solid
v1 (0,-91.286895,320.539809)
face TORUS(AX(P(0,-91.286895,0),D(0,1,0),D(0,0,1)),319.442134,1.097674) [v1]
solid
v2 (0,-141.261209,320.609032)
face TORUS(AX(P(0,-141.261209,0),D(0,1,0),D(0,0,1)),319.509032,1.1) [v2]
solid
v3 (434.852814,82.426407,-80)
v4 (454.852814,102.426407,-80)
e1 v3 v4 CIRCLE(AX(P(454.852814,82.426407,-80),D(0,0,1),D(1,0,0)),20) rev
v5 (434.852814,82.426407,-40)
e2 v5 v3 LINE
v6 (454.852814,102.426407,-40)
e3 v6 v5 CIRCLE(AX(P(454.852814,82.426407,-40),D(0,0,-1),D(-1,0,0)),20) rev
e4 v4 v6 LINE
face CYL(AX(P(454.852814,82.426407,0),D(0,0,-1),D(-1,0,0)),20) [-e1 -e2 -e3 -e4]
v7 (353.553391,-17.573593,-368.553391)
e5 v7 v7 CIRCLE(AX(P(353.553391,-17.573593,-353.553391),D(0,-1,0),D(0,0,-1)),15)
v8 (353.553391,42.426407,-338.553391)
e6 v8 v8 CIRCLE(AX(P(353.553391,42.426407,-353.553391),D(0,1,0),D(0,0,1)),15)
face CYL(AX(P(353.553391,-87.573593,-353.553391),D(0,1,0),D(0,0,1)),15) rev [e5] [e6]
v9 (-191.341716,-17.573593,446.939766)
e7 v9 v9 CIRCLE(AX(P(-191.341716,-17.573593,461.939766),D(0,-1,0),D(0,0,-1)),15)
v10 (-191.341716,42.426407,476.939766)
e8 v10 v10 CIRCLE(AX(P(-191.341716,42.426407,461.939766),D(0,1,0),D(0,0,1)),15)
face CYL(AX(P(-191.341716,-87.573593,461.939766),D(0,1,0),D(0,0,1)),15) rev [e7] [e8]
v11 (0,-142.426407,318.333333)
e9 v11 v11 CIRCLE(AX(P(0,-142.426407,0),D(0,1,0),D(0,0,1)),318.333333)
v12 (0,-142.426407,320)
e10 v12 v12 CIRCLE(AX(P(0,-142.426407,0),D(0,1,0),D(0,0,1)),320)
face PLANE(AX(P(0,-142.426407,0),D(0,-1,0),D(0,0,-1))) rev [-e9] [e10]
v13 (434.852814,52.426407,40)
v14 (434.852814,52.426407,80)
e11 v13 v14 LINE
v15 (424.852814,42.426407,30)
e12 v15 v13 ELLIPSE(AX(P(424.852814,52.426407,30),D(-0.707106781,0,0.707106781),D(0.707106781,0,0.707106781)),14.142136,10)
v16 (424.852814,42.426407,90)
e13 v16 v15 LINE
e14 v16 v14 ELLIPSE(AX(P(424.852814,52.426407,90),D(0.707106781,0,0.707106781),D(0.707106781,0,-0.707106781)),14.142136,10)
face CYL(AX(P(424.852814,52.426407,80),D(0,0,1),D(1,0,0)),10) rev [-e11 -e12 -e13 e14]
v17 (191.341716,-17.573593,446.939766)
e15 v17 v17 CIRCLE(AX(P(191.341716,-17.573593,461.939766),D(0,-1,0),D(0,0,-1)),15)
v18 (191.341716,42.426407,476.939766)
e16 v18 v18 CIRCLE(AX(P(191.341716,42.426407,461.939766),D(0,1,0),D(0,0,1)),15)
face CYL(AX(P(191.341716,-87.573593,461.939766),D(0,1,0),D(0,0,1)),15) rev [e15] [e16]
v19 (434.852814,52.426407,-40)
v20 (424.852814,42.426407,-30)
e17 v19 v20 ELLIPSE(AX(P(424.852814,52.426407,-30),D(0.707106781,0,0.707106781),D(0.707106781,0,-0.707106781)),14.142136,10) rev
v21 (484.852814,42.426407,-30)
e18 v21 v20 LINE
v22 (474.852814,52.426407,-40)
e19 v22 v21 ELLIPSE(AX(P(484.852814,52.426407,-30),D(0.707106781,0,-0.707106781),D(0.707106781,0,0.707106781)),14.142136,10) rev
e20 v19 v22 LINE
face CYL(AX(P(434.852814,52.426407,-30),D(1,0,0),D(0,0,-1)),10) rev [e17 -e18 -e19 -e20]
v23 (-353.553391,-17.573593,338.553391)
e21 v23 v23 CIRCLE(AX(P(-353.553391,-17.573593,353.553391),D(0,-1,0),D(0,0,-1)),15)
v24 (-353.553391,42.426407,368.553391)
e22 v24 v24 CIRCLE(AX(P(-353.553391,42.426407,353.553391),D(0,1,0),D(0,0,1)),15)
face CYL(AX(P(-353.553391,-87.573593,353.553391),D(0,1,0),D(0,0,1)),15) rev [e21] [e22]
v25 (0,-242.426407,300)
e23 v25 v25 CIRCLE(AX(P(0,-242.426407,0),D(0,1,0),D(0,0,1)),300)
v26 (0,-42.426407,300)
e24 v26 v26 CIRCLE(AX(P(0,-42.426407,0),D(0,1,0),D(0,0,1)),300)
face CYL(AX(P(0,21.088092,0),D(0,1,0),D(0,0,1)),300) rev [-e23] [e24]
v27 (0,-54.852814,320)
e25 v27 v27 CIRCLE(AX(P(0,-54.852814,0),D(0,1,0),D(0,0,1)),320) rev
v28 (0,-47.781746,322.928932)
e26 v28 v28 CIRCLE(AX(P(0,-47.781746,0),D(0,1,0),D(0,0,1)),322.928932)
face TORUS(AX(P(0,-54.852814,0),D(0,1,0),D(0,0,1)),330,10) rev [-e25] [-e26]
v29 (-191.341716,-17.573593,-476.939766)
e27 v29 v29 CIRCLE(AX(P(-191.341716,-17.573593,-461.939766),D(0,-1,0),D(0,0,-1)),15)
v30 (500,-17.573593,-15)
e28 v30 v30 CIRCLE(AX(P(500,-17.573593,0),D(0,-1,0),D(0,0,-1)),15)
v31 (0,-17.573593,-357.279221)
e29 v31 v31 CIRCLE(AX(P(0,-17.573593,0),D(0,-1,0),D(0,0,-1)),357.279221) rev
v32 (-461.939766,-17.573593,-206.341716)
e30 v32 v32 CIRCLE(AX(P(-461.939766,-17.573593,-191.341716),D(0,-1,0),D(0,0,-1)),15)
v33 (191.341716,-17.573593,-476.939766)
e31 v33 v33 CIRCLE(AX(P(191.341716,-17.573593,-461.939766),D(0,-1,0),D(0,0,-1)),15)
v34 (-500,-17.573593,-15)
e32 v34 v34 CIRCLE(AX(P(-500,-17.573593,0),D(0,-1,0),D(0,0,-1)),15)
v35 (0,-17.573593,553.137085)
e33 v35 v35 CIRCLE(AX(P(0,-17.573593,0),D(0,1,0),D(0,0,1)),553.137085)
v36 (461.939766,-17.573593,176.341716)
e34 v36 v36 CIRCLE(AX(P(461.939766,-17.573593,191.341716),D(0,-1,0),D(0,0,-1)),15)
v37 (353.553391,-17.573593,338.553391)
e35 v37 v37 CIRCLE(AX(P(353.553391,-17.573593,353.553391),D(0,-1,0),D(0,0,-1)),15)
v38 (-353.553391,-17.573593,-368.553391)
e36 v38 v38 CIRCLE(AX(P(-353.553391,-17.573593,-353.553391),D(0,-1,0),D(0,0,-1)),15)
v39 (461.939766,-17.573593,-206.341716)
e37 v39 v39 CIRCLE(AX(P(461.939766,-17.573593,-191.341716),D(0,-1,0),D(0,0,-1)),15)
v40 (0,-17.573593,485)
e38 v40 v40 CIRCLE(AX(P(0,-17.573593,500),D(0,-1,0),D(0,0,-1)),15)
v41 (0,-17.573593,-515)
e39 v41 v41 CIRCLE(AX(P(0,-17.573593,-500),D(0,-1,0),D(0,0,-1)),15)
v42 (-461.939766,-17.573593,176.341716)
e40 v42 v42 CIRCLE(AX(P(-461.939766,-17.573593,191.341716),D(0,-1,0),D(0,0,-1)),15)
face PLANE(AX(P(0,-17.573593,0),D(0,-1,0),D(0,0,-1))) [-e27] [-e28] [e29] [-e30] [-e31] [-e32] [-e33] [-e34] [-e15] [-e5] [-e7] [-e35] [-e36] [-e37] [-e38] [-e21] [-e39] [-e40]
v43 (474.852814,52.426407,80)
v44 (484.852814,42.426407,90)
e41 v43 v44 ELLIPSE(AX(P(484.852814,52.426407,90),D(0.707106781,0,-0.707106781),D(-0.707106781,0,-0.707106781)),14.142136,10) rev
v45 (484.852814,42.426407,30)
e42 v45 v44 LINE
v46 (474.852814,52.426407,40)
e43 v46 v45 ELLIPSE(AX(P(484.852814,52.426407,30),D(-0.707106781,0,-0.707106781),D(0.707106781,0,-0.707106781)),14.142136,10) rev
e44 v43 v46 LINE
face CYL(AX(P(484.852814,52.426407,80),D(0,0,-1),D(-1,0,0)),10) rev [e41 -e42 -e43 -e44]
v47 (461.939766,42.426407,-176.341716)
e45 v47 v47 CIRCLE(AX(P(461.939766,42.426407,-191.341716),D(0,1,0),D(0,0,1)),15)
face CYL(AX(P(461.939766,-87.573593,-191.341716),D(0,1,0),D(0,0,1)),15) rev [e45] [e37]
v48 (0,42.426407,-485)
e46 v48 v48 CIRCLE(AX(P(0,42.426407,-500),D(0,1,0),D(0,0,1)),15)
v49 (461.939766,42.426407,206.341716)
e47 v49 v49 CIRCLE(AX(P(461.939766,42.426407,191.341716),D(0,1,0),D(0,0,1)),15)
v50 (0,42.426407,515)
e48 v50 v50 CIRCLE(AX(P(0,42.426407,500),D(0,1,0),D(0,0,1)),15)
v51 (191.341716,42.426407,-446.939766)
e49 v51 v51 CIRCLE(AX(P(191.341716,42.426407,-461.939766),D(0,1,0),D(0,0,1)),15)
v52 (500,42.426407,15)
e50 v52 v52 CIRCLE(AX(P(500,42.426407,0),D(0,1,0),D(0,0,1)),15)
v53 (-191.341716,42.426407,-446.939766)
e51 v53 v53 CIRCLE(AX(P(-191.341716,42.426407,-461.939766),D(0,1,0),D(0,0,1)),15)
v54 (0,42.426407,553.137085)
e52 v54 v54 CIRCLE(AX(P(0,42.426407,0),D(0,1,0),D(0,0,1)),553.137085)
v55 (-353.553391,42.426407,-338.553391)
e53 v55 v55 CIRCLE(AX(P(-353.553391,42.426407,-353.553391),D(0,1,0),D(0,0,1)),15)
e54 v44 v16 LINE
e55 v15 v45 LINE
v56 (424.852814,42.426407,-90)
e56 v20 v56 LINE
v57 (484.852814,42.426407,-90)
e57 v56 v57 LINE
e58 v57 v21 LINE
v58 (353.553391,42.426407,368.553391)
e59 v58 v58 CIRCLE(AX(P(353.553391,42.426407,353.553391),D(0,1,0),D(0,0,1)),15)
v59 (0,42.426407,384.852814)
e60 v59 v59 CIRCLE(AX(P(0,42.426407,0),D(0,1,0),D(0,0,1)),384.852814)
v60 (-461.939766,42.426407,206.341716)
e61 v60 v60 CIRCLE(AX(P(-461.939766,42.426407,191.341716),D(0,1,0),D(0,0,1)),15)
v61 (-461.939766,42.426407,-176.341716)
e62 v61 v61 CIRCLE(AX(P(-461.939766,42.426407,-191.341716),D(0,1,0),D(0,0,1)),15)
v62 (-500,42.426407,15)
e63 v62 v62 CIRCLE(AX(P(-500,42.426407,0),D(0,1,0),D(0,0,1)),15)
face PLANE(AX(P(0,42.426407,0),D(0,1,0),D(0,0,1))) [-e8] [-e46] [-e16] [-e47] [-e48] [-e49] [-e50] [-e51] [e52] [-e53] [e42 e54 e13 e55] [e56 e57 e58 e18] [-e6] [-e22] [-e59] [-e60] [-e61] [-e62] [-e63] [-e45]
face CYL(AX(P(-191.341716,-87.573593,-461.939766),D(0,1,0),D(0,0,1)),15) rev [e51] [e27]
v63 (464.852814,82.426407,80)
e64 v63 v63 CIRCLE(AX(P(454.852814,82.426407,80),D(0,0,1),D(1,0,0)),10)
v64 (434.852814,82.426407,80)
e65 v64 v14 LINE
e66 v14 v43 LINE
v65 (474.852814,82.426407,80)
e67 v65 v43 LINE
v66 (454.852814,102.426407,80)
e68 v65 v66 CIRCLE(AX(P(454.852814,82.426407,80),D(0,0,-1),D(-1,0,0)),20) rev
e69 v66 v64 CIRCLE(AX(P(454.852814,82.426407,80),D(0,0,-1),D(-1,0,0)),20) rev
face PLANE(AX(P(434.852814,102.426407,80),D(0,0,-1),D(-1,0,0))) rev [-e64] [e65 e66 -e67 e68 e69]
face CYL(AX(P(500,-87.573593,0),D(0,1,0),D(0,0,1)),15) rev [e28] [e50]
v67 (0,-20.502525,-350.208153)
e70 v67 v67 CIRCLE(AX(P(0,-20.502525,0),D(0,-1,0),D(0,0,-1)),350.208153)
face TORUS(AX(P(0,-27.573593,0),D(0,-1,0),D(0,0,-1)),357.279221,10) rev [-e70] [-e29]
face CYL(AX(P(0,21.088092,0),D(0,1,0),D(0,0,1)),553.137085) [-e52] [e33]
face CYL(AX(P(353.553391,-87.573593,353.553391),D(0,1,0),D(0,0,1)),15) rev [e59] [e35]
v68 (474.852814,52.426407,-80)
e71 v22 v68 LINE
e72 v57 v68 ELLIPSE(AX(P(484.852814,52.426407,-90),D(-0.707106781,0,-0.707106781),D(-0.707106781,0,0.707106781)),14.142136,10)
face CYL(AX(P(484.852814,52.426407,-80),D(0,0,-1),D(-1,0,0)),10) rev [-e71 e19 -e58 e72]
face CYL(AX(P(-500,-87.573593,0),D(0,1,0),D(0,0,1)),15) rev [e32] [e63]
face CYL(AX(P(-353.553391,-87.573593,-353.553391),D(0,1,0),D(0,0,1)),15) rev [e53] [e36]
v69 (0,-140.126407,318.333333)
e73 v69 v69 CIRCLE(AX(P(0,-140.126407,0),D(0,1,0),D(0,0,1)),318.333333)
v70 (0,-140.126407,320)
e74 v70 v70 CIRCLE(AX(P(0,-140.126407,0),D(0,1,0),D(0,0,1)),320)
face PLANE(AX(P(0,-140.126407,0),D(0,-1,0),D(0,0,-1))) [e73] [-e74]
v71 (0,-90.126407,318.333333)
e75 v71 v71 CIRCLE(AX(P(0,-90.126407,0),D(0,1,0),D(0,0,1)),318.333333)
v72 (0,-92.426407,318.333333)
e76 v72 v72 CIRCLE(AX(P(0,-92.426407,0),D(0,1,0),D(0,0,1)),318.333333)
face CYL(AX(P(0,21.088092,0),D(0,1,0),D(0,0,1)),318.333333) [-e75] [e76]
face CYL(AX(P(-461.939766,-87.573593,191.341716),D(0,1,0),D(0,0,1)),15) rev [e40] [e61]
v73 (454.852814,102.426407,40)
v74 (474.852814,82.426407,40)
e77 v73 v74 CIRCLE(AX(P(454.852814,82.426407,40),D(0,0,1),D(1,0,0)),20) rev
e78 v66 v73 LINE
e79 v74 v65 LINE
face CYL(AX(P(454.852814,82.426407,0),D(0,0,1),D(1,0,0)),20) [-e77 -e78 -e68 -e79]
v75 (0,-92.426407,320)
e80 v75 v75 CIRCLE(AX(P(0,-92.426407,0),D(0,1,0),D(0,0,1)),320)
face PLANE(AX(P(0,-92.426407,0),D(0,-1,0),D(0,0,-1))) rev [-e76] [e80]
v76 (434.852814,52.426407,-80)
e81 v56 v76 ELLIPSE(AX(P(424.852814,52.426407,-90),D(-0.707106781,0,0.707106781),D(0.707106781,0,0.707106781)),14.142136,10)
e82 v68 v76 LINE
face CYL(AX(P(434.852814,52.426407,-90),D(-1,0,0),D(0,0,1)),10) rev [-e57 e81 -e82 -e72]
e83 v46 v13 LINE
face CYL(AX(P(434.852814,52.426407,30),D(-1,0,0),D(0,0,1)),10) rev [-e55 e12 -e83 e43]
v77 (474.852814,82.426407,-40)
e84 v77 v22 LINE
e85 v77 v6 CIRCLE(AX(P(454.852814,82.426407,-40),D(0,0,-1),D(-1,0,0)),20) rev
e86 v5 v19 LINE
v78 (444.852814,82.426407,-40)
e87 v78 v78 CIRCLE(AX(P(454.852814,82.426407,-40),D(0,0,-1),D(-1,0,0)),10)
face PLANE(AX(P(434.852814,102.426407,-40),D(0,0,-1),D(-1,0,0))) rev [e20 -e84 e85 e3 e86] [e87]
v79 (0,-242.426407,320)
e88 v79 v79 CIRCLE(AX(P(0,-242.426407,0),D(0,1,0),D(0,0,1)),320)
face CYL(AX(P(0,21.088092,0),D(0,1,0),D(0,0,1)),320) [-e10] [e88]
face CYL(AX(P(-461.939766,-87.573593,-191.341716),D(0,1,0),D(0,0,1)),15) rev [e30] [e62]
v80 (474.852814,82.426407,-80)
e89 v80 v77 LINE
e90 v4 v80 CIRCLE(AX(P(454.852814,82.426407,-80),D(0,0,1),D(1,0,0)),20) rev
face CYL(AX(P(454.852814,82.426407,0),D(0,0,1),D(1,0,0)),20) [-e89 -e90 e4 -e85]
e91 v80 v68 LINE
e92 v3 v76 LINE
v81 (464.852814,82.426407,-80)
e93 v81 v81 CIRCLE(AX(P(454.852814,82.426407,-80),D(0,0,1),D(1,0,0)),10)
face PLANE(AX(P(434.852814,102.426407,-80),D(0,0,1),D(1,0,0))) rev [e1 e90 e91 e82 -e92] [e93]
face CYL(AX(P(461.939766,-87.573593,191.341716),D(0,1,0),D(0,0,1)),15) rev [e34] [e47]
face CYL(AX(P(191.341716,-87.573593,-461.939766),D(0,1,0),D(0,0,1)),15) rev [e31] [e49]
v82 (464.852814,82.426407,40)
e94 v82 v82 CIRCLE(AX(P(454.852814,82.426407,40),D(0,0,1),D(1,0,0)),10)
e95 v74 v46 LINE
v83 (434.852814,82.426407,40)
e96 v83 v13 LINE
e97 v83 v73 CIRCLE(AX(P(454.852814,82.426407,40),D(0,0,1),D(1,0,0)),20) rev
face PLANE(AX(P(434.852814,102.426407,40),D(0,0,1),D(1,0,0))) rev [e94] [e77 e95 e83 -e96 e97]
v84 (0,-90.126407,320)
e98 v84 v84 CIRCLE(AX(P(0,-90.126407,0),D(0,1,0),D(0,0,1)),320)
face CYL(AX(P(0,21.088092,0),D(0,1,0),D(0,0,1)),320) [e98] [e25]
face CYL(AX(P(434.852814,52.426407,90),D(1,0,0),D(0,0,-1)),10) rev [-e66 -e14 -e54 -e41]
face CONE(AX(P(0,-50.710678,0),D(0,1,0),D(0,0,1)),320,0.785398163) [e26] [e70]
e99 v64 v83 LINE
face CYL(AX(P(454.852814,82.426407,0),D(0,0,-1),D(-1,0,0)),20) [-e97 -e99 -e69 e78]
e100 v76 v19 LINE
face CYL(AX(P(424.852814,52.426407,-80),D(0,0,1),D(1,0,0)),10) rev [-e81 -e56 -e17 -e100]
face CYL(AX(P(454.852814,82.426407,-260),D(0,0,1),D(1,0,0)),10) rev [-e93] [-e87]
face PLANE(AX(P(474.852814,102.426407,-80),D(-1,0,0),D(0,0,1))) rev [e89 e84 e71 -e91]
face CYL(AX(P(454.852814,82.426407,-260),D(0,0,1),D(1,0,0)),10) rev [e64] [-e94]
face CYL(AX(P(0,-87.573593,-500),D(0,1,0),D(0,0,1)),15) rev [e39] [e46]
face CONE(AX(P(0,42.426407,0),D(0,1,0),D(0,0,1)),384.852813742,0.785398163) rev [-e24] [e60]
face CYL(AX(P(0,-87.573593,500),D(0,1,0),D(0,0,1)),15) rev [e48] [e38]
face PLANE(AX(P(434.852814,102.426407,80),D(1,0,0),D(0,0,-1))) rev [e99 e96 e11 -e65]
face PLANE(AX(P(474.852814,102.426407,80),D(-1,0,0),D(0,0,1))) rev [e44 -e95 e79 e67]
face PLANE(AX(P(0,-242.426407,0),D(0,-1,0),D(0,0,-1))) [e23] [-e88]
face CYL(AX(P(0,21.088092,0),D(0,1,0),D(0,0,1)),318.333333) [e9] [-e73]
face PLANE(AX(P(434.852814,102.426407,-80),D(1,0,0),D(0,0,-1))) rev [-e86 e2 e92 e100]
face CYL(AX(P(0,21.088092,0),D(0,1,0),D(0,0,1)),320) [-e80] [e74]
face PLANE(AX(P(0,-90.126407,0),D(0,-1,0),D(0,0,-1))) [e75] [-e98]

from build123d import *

# Parameters (mm, degrees)
SKETCH2_R           = 15
CUT_EXTRUDE2_DEPTH  = 130
FILLET1_R           = 10
SKETCH3_W           = 40
SKETCH3_H           = 40
BOSS_EXTRUDE1_DEPTH = 60
SKETCH4_R           = 10
CUT_EXTRUDE3_DEPTH  = 340
FILLET2_R           = 20
FILLET3_R           = 10
SKETCH5_R           = 1.097674429
SKETCH5_R_2         = 1.1


# Read off the part's stored shape, not the designer's step: Revolve1
with BuildPart() as part:
    # Revolve1 outline → Revolve1 (revolve)
    with BuildSketch(Plane.XY):
        Polygon((318.333333333, -90.126406871), (320, -90.126406871), (320, -50.710678119), (353.13708499, -17.573593129), (553.13708499, -17.573593129), (553.13708499, 42.426406871), (384.852813742, 42.426406871), (300, -42.426406871), (300, -242.426406871), (320, -242.426406871), (320, -142.426406871), (318.333333333, -142.426406871), (318.333333333, -140.126406871), (320, -140.126406871), (320, -92.426406871), (318.333333333, -92.426406871), align=None)
    revolve(axis=Axis((0, 0, 0), (0, 1, 0)))

    # Sketch2 → Cut-Extrude2 (cut)
    with BuildSketch(Plane(origin=(0, 42.426406871, 0), x_dir=(1, 0, 0), z_dir=(0, 1, 0))):
        with Locations(Location((500, 0, 0), (0, 0, 270))):
            Circle(SKETCH2_R)
        with Locations(Location((461.939766256, -191.341716183, 0), (0, 0, 270))):
            Circle(SKETCH2_R)
        with Locations(Location((353.553390593, -353.553390593, 0), (0, 0, 270))):
            Circle(SKETCH2_R)
        with Locations(Location((191.341716183, -461.939766256, 0), (0, 0, 270))):
            Circle(SKETCH2_R)
        with Locations(Location((0, -500, 0), (0, 0, 270))):
            Circle(SKETCH2_R)
        with Locations(Location((-191.341716183, -461.939766256, 0), (0, 0, 270))):
            Circle(SKETCH2_R)
        with Locations(Location((-353.553390593, -353.553390593, 0), (0, 0, 270))):
            Circle(SKETCH2_R)
        with Locations(Location((-461.939766256, -191.341716183, 0), (0, 0, 270))):
            Circle(SKETCH2_R)
        with Locations(Location((-500, 0, 0), (0, 0, 270))):
            Circle(SKETCH2_R)
        with Locations(Location((-461.939766256, 191.341716183, 0), (0, 0, 270))):
            Circle(SKETCH2_R)
        with Locations(Location((-353.553390593, 353.553390593, 0), (0, 0, 270))):
            Circle(SKETCH2_R)
        with Locations(Location((-191.341716183, 461.939766256, 0), (0, 0, 270))):
            Circle(SKETCH2_R)
        with Locations(Location((0, 500, 0), (0, 0, 270))):
            Circle(SKETCH2_R)
        with Locations(Location((191.341716183, 461.939766256, 0), (0, 0, 270))):
            Circle(SKETCH2_R)
        with Locations(Location((353.553390593, 353.553390593, 0), (0, 0, 270))):
            Circle(SKETCH2_R)
        with Locations(Location((461.939766256, 191.341716183, 0), (0, 0, 270))):
            Circle(SKETCH2_R)
    extrude(amount=-CUT_EXTRUDE2_DEPTH, mode=Mode.SUBTRACT)

    # Fillet1
    fillet1_edges = [part.edges().sort_by_distance(p)[0] for p in [
        (-353.13708499, -17.573593129, 0),
        (-320, -50.710678119, 0),
    ]]
    fillet(fillet1_edges, radius=FILLET1_R)

    # Sketch3 → Boss-Extrude1 (add)
    with BuildSketch(Plane(origin=(0, 42.426406871, 0), x_dir=(1, 0, 0), z_dir=(0, 1, 0))):
        with Locations((454.852813742, 60)):
            Rectangle(SKETCH3_W, SKETCH3_H)
        with Locations((454.852813742, -60)):
            Rectangle(SKETCH3_W, SKETCH3_H)
    extrude(amount=BOSS_EXTRUDE1_DEPTH)

    # Sketch4 → Cut-Extrude3 (cut)
    with BuildSketch(Plane.XY.offset(80)):
        with Locations((454.852813742, 82.426406871)):
            Circle(SKETCH4_R)
    extrude(amount=-CUT_EXTRUDE3_DEPTH, mode=Mode.SUBTRACT)

    # Fillet2
    fillet2_edges = [part.edges().sort_by_distance(p)[0] for p in [
        (474.852813742, 102.426406871, -60),
        (434.852813742, 102.426406871, -60),
        (434.852813742, 102.426406871, 60),
        (474.852813742, 102.426406871, 60),
    ]]
    fillet(fillet2_edges, radius=FILLET2_R - 0.0001)  # a hair under: the kernel refuses the full size

    # Fillet3
    fillet3_edges = [part.edges().sort_by_distance(p)[0] for p in [
        (474.852813742, 42.426406871, -60),
        (454.852813742, 42.426406871, -80),
        (434.852813742, 42.426406871, -60),
        (454.852813742, 42.426406871, -40),
        (454.852813742, 42.426406871, 40),
        (434.852813742, 42.426406871, 60),
        (454.852813742, 42.426406871, 80),
        (474.852813742, 42.426406871, 60),
    ]]
    fillet(fillet3_edges, radius=FILLET3_R)


with BuildPart() as body_2:
    # Sketch5 → Revolve2 (revolve)
    with BuildSketch(Plane.XY, mode=Mode.PRIVATE) as revolve2_sk:
        with Locations((319.44213417, -91.28689488)):
            Circle(SKETCH5_R)
        with Locations((319.509031711, -141.261208914)):
            Circle(SKETCH5_R_2)
    revolve(revolve2_sk.sketch.rotate(Axis((0, 86.974737714, 0), (0, -1, 0)), 90), axis=Axis((0, 86.974737714, 0), (0, -1, 0)))


solid = Compound([part.part, body_2.part])
